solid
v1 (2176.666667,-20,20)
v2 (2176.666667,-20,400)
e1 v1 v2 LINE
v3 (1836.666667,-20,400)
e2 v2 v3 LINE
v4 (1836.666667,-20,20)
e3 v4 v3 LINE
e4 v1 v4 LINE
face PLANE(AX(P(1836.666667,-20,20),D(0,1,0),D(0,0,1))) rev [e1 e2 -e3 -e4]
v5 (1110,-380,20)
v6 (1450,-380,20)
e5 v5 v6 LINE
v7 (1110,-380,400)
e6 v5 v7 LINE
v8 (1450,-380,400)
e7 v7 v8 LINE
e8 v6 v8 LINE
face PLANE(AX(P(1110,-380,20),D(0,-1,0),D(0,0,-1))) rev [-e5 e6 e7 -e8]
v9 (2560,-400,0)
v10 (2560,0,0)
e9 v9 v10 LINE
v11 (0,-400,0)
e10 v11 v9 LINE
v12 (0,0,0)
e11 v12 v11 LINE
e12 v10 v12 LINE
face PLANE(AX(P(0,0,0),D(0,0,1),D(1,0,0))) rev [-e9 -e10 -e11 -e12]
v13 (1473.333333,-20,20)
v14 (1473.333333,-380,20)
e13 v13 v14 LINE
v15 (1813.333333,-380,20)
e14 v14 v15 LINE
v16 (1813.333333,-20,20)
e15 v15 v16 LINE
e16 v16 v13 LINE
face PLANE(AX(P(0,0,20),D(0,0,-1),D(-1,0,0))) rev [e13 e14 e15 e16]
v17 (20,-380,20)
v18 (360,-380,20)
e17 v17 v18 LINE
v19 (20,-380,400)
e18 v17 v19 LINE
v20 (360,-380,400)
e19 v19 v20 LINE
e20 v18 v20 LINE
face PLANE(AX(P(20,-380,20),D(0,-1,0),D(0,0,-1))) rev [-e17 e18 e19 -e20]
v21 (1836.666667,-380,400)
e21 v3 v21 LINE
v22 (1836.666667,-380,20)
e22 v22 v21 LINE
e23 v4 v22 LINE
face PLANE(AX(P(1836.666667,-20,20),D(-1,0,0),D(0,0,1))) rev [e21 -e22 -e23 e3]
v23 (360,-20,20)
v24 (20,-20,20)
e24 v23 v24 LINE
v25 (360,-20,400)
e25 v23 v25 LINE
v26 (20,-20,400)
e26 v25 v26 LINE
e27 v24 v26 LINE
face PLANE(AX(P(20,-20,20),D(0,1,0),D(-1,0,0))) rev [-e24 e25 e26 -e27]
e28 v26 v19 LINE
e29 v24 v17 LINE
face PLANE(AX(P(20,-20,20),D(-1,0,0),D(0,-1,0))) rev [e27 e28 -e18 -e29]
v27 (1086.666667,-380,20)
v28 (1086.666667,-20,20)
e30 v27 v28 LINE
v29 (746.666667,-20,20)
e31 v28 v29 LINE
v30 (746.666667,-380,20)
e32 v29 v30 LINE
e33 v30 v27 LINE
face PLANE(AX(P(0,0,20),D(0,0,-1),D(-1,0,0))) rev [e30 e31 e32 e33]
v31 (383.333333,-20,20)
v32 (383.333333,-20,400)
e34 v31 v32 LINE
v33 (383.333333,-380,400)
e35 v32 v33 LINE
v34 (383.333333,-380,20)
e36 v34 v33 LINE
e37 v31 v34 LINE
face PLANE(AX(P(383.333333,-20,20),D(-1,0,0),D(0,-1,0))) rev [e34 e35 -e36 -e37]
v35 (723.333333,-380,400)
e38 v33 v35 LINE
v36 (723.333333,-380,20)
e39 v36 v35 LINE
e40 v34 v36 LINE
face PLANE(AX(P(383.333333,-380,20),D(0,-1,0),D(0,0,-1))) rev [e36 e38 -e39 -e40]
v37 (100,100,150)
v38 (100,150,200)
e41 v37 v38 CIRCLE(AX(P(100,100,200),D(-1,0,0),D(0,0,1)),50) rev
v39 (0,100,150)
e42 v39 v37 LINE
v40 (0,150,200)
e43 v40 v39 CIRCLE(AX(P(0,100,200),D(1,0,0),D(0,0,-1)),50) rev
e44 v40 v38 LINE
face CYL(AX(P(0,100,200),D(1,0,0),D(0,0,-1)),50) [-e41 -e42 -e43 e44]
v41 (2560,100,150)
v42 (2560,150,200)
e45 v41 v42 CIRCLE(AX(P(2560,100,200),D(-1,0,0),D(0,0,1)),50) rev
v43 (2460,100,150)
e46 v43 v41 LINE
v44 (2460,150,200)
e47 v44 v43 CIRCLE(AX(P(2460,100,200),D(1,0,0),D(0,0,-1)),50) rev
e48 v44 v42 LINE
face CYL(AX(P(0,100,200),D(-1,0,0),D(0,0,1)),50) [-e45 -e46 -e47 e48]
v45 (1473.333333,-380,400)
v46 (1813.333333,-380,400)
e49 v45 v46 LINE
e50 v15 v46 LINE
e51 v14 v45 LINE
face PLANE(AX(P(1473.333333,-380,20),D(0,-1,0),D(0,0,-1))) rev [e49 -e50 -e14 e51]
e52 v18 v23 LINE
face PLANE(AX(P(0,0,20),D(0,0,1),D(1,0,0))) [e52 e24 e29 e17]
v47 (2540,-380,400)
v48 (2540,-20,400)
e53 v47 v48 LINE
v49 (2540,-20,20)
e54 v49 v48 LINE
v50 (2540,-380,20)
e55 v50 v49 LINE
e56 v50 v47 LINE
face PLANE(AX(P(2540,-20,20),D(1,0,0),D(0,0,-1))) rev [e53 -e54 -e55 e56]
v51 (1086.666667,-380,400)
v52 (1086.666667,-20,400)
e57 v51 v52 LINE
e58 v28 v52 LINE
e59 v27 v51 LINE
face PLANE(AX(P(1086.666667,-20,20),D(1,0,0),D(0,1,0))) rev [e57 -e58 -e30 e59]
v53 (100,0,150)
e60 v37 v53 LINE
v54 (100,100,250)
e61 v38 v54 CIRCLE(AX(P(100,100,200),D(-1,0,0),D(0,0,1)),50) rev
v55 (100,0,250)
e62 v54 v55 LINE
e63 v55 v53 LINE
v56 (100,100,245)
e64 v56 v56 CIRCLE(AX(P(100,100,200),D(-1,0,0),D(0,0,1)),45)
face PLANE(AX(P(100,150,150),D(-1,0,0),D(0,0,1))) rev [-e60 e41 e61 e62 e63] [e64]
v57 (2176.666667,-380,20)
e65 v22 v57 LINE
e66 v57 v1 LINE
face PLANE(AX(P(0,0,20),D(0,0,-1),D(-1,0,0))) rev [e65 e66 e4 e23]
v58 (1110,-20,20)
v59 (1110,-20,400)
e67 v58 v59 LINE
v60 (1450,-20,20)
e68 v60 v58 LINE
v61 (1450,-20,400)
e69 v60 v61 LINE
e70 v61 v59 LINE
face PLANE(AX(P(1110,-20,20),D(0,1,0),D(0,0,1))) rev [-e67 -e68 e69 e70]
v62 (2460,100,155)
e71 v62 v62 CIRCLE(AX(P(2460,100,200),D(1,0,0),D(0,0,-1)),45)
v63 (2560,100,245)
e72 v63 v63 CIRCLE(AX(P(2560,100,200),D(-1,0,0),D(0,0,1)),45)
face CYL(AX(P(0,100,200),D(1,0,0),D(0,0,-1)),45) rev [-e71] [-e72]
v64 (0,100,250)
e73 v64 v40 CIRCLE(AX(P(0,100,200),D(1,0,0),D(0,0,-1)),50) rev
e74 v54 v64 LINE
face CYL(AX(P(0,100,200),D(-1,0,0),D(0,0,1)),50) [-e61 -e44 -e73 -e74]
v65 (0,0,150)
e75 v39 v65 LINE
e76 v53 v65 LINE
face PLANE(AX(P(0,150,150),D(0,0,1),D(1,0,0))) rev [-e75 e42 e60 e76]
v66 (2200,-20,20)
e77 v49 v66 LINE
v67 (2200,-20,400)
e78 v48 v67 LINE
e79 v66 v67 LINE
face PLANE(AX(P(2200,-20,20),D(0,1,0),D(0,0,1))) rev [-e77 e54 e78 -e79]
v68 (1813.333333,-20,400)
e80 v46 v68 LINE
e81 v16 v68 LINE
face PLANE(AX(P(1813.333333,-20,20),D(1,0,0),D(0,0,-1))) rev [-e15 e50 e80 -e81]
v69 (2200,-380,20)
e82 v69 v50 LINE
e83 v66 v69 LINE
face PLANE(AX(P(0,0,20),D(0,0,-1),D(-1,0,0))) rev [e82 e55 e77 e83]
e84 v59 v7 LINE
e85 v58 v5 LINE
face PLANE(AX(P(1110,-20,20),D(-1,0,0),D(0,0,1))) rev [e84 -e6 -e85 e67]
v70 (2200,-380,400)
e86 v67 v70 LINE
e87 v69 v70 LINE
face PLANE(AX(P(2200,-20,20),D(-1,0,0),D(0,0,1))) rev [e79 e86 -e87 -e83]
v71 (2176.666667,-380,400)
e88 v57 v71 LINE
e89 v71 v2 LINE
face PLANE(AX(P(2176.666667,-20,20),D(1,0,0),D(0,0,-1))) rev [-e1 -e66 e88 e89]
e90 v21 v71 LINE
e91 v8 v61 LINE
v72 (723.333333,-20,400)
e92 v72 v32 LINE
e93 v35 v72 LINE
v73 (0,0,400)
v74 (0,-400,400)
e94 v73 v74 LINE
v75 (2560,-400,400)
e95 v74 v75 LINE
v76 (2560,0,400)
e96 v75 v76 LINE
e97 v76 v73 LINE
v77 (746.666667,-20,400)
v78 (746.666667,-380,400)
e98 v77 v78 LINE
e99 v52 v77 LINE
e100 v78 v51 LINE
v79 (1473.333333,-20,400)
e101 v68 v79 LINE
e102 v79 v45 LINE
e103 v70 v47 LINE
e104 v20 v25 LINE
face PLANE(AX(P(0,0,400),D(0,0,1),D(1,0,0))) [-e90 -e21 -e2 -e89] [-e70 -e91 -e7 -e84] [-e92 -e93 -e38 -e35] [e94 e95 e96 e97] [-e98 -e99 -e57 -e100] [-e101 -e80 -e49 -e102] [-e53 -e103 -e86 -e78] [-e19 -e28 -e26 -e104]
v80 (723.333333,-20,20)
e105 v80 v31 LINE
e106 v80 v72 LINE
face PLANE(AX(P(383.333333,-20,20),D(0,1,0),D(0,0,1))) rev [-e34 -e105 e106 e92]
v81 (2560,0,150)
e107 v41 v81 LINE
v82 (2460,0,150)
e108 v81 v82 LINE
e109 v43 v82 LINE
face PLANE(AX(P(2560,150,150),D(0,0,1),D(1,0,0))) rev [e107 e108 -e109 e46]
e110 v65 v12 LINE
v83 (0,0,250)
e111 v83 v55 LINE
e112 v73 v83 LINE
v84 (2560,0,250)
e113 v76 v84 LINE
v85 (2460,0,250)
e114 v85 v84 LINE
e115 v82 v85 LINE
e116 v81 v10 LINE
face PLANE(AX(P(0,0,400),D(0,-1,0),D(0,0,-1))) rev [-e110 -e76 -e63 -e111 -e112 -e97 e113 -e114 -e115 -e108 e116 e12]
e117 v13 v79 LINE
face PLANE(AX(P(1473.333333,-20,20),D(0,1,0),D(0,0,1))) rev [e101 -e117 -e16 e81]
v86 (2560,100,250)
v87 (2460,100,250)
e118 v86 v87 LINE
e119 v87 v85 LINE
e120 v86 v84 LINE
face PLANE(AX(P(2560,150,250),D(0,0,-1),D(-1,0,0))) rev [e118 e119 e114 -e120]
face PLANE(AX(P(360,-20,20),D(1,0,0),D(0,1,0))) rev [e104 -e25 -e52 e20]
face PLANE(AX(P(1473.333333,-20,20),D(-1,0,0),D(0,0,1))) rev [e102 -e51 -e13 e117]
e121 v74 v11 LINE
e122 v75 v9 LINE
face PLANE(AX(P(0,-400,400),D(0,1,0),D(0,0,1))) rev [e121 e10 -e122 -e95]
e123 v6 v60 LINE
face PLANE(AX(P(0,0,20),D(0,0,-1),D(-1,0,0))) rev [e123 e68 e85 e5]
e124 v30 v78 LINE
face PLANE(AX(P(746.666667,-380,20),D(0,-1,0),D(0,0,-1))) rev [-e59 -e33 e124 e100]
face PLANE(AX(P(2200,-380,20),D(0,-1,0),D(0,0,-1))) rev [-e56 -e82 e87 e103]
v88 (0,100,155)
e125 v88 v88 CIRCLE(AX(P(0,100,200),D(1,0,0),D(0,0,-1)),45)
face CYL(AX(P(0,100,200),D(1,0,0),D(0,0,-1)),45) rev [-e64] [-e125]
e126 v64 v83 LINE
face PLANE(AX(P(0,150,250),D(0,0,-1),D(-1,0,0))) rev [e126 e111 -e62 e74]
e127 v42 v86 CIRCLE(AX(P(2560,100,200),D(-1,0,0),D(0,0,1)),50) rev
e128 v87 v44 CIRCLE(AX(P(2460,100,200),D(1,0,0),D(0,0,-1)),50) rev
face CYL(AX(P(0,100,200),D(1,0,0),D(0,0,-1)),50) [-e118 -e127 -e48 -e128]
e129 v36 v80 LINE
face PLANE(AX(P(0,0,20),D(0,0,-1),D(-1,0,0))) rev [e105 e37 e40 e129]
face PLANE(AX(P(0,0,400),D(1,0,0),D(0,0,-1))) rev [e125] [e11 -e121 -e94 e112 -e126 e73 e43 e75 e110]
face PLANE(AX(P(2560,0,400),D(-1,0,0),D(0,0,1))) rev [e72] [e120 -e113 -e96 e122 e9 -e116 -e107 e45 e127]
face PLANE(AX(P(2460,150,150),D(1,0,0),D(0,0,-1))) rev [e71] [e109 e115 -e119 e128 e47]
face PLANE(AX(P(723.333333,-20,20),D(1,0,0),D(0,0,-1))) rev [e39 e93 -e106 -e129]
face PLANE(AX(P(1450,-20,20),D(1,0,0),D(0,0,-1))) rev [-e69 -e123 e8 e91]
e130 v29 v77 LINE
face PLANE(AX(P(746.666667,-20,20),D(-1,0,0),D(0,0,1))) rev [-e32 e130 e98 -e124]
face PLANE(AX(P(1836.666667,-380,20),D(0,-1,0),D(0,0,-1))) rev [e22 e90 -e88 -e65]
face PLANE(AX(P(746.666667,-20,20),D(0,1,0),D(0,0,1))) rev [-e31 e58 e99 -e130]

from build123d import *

# Parameters (mm, degrees)
SKETCH1_W               = 2560
SKETCH1_H               = 400
BOSS_EXTRUDE1_DEPTH     = 400
SKETCH2_W               = 340
SKETCH2_H               = 360
CUT_EXTRUDE1_DEPTH      = 380
SKETCH3_W               = 100
SKETCH3_H               = 100
BOSS_EXTRUDE2_DEPTH     = 150
FILLET1_R               = 50
SKETCH4_W               = 100
SKETCH4_H               = 100
BOSS_EXTRUDE3_DEPTH     = 150
FILLET2_R               = 50
CUT_EXTRUDE2_DEPTH      = 2622.755137308
CUT_EXTRUDE2_DEPTH_BACK = 2622.755137308
SKETCH5_R               = 45


with BuildPart() as part:
    # Sketch1 → Boss-Extrude1 (new body)
    with BuildSketch(Plane.XY):
        with Locations((1280, -200)):
            Rectangle(SKETCH1_W, SKETCH1_H)
    extrude(amount=BOSS_EXTRUDE1_DEPTH)

    # Sketch2 → Cut-Extrude1 (cut)
    with BuildSketch(Plane.XY.offset(400)):
        with Locations((190, -200)):
            Rectangle(SKETCH2_W, SKETCH2_H)
        with Locations((553.333333333, -200)):
            Rectangle(SKETCH2_W, SKETCH2_H)
        with Locations((916.666666667, -200)):
            Rectangle(SKETCH2_W, SKETCH2_H)
        with Locations((1280, -200)):
            Rectangle(SKETCH2_W, SKETCH2_H)
        with Locations((1643.333333333, -200)):
            Rectangle(SKETCH2_W, SKETCH2_H)
        with Locations((2006.666666667, -200)):
            Rectangle(SKETCH2_W, SKETCH2_H)
        with Locations((2370, -200)):
            Rectangle(SKETCH2_W, SKETCH2_H)
    extrude(amount=-CUT_EXTRUDE1_DEPTH, mode=Mode.SUBTRACT)

    # Sketch3 → Boss-Extrude2 (add)
    with BuildSketch(Plane(origin=(0, 0, 0), x_dir=(1, 0, 0), z_dir=(0, 1, 0))):
        with Locations((50, -200)):
            Rectangle(SKETCH3_W, SKETCH3_H)
    extrude(amount=BOSS_EXTRUDE2_DEPTH)

    # Fillet1
    fillet1_edges = [part.edges().sort_by_distance(p)[0] for p in [
        (50, 150, 150),
        (50, 150, 250),
    ]]
    fillet(fillet1_edges, radius=FILLET1_R - 0.0001)  # a hair under: the kernel refuses the full size

    # Sketch4 → Boss-Extrude3 (add)
    with BuildSketch(Plane(origin=(0, 0, 0), x_dir=(1, 0, 0), z_dir=(0, 1, 0))):
        with Locations((2510, -200)):
            Rectangle(SKETCH4_W, SKETCH4_H)
    extrude(amount=BOSS_EXTRUDE3_DEPTH)

    # Fillet2
    fillet2_edges = [part.edges().sort_by_distance(p)[0] for p in [
        (2510, 150, 150),
        (2510, 150, 250),
    ]]
    fillet(fillet2_edges, radius=FILLET2_R - 0.0001)  # a hair under: the kernel refuses the full size

    # Sketch5 → Cut-Extrude2 (cut, two sides: drawn at the far end of the back side and taken through both)
    with BuildSketch(Plane(origin=(2560, 0, 0), x_dir=(0, 0, -1), z_dir=(1, 0, 0)).offset(-CUT_EXTRUDE2_DEPTH_BACK)):
        with Locations((-200, 100)):
            Circle(SKETCH5_R)
    extrude(amount=CUT_EXTRUDE2_DEPTH + CUT_EXTRUDE2_DEPTH_BACK, mode=Mode.SUBTRACT)


solid = part.part
